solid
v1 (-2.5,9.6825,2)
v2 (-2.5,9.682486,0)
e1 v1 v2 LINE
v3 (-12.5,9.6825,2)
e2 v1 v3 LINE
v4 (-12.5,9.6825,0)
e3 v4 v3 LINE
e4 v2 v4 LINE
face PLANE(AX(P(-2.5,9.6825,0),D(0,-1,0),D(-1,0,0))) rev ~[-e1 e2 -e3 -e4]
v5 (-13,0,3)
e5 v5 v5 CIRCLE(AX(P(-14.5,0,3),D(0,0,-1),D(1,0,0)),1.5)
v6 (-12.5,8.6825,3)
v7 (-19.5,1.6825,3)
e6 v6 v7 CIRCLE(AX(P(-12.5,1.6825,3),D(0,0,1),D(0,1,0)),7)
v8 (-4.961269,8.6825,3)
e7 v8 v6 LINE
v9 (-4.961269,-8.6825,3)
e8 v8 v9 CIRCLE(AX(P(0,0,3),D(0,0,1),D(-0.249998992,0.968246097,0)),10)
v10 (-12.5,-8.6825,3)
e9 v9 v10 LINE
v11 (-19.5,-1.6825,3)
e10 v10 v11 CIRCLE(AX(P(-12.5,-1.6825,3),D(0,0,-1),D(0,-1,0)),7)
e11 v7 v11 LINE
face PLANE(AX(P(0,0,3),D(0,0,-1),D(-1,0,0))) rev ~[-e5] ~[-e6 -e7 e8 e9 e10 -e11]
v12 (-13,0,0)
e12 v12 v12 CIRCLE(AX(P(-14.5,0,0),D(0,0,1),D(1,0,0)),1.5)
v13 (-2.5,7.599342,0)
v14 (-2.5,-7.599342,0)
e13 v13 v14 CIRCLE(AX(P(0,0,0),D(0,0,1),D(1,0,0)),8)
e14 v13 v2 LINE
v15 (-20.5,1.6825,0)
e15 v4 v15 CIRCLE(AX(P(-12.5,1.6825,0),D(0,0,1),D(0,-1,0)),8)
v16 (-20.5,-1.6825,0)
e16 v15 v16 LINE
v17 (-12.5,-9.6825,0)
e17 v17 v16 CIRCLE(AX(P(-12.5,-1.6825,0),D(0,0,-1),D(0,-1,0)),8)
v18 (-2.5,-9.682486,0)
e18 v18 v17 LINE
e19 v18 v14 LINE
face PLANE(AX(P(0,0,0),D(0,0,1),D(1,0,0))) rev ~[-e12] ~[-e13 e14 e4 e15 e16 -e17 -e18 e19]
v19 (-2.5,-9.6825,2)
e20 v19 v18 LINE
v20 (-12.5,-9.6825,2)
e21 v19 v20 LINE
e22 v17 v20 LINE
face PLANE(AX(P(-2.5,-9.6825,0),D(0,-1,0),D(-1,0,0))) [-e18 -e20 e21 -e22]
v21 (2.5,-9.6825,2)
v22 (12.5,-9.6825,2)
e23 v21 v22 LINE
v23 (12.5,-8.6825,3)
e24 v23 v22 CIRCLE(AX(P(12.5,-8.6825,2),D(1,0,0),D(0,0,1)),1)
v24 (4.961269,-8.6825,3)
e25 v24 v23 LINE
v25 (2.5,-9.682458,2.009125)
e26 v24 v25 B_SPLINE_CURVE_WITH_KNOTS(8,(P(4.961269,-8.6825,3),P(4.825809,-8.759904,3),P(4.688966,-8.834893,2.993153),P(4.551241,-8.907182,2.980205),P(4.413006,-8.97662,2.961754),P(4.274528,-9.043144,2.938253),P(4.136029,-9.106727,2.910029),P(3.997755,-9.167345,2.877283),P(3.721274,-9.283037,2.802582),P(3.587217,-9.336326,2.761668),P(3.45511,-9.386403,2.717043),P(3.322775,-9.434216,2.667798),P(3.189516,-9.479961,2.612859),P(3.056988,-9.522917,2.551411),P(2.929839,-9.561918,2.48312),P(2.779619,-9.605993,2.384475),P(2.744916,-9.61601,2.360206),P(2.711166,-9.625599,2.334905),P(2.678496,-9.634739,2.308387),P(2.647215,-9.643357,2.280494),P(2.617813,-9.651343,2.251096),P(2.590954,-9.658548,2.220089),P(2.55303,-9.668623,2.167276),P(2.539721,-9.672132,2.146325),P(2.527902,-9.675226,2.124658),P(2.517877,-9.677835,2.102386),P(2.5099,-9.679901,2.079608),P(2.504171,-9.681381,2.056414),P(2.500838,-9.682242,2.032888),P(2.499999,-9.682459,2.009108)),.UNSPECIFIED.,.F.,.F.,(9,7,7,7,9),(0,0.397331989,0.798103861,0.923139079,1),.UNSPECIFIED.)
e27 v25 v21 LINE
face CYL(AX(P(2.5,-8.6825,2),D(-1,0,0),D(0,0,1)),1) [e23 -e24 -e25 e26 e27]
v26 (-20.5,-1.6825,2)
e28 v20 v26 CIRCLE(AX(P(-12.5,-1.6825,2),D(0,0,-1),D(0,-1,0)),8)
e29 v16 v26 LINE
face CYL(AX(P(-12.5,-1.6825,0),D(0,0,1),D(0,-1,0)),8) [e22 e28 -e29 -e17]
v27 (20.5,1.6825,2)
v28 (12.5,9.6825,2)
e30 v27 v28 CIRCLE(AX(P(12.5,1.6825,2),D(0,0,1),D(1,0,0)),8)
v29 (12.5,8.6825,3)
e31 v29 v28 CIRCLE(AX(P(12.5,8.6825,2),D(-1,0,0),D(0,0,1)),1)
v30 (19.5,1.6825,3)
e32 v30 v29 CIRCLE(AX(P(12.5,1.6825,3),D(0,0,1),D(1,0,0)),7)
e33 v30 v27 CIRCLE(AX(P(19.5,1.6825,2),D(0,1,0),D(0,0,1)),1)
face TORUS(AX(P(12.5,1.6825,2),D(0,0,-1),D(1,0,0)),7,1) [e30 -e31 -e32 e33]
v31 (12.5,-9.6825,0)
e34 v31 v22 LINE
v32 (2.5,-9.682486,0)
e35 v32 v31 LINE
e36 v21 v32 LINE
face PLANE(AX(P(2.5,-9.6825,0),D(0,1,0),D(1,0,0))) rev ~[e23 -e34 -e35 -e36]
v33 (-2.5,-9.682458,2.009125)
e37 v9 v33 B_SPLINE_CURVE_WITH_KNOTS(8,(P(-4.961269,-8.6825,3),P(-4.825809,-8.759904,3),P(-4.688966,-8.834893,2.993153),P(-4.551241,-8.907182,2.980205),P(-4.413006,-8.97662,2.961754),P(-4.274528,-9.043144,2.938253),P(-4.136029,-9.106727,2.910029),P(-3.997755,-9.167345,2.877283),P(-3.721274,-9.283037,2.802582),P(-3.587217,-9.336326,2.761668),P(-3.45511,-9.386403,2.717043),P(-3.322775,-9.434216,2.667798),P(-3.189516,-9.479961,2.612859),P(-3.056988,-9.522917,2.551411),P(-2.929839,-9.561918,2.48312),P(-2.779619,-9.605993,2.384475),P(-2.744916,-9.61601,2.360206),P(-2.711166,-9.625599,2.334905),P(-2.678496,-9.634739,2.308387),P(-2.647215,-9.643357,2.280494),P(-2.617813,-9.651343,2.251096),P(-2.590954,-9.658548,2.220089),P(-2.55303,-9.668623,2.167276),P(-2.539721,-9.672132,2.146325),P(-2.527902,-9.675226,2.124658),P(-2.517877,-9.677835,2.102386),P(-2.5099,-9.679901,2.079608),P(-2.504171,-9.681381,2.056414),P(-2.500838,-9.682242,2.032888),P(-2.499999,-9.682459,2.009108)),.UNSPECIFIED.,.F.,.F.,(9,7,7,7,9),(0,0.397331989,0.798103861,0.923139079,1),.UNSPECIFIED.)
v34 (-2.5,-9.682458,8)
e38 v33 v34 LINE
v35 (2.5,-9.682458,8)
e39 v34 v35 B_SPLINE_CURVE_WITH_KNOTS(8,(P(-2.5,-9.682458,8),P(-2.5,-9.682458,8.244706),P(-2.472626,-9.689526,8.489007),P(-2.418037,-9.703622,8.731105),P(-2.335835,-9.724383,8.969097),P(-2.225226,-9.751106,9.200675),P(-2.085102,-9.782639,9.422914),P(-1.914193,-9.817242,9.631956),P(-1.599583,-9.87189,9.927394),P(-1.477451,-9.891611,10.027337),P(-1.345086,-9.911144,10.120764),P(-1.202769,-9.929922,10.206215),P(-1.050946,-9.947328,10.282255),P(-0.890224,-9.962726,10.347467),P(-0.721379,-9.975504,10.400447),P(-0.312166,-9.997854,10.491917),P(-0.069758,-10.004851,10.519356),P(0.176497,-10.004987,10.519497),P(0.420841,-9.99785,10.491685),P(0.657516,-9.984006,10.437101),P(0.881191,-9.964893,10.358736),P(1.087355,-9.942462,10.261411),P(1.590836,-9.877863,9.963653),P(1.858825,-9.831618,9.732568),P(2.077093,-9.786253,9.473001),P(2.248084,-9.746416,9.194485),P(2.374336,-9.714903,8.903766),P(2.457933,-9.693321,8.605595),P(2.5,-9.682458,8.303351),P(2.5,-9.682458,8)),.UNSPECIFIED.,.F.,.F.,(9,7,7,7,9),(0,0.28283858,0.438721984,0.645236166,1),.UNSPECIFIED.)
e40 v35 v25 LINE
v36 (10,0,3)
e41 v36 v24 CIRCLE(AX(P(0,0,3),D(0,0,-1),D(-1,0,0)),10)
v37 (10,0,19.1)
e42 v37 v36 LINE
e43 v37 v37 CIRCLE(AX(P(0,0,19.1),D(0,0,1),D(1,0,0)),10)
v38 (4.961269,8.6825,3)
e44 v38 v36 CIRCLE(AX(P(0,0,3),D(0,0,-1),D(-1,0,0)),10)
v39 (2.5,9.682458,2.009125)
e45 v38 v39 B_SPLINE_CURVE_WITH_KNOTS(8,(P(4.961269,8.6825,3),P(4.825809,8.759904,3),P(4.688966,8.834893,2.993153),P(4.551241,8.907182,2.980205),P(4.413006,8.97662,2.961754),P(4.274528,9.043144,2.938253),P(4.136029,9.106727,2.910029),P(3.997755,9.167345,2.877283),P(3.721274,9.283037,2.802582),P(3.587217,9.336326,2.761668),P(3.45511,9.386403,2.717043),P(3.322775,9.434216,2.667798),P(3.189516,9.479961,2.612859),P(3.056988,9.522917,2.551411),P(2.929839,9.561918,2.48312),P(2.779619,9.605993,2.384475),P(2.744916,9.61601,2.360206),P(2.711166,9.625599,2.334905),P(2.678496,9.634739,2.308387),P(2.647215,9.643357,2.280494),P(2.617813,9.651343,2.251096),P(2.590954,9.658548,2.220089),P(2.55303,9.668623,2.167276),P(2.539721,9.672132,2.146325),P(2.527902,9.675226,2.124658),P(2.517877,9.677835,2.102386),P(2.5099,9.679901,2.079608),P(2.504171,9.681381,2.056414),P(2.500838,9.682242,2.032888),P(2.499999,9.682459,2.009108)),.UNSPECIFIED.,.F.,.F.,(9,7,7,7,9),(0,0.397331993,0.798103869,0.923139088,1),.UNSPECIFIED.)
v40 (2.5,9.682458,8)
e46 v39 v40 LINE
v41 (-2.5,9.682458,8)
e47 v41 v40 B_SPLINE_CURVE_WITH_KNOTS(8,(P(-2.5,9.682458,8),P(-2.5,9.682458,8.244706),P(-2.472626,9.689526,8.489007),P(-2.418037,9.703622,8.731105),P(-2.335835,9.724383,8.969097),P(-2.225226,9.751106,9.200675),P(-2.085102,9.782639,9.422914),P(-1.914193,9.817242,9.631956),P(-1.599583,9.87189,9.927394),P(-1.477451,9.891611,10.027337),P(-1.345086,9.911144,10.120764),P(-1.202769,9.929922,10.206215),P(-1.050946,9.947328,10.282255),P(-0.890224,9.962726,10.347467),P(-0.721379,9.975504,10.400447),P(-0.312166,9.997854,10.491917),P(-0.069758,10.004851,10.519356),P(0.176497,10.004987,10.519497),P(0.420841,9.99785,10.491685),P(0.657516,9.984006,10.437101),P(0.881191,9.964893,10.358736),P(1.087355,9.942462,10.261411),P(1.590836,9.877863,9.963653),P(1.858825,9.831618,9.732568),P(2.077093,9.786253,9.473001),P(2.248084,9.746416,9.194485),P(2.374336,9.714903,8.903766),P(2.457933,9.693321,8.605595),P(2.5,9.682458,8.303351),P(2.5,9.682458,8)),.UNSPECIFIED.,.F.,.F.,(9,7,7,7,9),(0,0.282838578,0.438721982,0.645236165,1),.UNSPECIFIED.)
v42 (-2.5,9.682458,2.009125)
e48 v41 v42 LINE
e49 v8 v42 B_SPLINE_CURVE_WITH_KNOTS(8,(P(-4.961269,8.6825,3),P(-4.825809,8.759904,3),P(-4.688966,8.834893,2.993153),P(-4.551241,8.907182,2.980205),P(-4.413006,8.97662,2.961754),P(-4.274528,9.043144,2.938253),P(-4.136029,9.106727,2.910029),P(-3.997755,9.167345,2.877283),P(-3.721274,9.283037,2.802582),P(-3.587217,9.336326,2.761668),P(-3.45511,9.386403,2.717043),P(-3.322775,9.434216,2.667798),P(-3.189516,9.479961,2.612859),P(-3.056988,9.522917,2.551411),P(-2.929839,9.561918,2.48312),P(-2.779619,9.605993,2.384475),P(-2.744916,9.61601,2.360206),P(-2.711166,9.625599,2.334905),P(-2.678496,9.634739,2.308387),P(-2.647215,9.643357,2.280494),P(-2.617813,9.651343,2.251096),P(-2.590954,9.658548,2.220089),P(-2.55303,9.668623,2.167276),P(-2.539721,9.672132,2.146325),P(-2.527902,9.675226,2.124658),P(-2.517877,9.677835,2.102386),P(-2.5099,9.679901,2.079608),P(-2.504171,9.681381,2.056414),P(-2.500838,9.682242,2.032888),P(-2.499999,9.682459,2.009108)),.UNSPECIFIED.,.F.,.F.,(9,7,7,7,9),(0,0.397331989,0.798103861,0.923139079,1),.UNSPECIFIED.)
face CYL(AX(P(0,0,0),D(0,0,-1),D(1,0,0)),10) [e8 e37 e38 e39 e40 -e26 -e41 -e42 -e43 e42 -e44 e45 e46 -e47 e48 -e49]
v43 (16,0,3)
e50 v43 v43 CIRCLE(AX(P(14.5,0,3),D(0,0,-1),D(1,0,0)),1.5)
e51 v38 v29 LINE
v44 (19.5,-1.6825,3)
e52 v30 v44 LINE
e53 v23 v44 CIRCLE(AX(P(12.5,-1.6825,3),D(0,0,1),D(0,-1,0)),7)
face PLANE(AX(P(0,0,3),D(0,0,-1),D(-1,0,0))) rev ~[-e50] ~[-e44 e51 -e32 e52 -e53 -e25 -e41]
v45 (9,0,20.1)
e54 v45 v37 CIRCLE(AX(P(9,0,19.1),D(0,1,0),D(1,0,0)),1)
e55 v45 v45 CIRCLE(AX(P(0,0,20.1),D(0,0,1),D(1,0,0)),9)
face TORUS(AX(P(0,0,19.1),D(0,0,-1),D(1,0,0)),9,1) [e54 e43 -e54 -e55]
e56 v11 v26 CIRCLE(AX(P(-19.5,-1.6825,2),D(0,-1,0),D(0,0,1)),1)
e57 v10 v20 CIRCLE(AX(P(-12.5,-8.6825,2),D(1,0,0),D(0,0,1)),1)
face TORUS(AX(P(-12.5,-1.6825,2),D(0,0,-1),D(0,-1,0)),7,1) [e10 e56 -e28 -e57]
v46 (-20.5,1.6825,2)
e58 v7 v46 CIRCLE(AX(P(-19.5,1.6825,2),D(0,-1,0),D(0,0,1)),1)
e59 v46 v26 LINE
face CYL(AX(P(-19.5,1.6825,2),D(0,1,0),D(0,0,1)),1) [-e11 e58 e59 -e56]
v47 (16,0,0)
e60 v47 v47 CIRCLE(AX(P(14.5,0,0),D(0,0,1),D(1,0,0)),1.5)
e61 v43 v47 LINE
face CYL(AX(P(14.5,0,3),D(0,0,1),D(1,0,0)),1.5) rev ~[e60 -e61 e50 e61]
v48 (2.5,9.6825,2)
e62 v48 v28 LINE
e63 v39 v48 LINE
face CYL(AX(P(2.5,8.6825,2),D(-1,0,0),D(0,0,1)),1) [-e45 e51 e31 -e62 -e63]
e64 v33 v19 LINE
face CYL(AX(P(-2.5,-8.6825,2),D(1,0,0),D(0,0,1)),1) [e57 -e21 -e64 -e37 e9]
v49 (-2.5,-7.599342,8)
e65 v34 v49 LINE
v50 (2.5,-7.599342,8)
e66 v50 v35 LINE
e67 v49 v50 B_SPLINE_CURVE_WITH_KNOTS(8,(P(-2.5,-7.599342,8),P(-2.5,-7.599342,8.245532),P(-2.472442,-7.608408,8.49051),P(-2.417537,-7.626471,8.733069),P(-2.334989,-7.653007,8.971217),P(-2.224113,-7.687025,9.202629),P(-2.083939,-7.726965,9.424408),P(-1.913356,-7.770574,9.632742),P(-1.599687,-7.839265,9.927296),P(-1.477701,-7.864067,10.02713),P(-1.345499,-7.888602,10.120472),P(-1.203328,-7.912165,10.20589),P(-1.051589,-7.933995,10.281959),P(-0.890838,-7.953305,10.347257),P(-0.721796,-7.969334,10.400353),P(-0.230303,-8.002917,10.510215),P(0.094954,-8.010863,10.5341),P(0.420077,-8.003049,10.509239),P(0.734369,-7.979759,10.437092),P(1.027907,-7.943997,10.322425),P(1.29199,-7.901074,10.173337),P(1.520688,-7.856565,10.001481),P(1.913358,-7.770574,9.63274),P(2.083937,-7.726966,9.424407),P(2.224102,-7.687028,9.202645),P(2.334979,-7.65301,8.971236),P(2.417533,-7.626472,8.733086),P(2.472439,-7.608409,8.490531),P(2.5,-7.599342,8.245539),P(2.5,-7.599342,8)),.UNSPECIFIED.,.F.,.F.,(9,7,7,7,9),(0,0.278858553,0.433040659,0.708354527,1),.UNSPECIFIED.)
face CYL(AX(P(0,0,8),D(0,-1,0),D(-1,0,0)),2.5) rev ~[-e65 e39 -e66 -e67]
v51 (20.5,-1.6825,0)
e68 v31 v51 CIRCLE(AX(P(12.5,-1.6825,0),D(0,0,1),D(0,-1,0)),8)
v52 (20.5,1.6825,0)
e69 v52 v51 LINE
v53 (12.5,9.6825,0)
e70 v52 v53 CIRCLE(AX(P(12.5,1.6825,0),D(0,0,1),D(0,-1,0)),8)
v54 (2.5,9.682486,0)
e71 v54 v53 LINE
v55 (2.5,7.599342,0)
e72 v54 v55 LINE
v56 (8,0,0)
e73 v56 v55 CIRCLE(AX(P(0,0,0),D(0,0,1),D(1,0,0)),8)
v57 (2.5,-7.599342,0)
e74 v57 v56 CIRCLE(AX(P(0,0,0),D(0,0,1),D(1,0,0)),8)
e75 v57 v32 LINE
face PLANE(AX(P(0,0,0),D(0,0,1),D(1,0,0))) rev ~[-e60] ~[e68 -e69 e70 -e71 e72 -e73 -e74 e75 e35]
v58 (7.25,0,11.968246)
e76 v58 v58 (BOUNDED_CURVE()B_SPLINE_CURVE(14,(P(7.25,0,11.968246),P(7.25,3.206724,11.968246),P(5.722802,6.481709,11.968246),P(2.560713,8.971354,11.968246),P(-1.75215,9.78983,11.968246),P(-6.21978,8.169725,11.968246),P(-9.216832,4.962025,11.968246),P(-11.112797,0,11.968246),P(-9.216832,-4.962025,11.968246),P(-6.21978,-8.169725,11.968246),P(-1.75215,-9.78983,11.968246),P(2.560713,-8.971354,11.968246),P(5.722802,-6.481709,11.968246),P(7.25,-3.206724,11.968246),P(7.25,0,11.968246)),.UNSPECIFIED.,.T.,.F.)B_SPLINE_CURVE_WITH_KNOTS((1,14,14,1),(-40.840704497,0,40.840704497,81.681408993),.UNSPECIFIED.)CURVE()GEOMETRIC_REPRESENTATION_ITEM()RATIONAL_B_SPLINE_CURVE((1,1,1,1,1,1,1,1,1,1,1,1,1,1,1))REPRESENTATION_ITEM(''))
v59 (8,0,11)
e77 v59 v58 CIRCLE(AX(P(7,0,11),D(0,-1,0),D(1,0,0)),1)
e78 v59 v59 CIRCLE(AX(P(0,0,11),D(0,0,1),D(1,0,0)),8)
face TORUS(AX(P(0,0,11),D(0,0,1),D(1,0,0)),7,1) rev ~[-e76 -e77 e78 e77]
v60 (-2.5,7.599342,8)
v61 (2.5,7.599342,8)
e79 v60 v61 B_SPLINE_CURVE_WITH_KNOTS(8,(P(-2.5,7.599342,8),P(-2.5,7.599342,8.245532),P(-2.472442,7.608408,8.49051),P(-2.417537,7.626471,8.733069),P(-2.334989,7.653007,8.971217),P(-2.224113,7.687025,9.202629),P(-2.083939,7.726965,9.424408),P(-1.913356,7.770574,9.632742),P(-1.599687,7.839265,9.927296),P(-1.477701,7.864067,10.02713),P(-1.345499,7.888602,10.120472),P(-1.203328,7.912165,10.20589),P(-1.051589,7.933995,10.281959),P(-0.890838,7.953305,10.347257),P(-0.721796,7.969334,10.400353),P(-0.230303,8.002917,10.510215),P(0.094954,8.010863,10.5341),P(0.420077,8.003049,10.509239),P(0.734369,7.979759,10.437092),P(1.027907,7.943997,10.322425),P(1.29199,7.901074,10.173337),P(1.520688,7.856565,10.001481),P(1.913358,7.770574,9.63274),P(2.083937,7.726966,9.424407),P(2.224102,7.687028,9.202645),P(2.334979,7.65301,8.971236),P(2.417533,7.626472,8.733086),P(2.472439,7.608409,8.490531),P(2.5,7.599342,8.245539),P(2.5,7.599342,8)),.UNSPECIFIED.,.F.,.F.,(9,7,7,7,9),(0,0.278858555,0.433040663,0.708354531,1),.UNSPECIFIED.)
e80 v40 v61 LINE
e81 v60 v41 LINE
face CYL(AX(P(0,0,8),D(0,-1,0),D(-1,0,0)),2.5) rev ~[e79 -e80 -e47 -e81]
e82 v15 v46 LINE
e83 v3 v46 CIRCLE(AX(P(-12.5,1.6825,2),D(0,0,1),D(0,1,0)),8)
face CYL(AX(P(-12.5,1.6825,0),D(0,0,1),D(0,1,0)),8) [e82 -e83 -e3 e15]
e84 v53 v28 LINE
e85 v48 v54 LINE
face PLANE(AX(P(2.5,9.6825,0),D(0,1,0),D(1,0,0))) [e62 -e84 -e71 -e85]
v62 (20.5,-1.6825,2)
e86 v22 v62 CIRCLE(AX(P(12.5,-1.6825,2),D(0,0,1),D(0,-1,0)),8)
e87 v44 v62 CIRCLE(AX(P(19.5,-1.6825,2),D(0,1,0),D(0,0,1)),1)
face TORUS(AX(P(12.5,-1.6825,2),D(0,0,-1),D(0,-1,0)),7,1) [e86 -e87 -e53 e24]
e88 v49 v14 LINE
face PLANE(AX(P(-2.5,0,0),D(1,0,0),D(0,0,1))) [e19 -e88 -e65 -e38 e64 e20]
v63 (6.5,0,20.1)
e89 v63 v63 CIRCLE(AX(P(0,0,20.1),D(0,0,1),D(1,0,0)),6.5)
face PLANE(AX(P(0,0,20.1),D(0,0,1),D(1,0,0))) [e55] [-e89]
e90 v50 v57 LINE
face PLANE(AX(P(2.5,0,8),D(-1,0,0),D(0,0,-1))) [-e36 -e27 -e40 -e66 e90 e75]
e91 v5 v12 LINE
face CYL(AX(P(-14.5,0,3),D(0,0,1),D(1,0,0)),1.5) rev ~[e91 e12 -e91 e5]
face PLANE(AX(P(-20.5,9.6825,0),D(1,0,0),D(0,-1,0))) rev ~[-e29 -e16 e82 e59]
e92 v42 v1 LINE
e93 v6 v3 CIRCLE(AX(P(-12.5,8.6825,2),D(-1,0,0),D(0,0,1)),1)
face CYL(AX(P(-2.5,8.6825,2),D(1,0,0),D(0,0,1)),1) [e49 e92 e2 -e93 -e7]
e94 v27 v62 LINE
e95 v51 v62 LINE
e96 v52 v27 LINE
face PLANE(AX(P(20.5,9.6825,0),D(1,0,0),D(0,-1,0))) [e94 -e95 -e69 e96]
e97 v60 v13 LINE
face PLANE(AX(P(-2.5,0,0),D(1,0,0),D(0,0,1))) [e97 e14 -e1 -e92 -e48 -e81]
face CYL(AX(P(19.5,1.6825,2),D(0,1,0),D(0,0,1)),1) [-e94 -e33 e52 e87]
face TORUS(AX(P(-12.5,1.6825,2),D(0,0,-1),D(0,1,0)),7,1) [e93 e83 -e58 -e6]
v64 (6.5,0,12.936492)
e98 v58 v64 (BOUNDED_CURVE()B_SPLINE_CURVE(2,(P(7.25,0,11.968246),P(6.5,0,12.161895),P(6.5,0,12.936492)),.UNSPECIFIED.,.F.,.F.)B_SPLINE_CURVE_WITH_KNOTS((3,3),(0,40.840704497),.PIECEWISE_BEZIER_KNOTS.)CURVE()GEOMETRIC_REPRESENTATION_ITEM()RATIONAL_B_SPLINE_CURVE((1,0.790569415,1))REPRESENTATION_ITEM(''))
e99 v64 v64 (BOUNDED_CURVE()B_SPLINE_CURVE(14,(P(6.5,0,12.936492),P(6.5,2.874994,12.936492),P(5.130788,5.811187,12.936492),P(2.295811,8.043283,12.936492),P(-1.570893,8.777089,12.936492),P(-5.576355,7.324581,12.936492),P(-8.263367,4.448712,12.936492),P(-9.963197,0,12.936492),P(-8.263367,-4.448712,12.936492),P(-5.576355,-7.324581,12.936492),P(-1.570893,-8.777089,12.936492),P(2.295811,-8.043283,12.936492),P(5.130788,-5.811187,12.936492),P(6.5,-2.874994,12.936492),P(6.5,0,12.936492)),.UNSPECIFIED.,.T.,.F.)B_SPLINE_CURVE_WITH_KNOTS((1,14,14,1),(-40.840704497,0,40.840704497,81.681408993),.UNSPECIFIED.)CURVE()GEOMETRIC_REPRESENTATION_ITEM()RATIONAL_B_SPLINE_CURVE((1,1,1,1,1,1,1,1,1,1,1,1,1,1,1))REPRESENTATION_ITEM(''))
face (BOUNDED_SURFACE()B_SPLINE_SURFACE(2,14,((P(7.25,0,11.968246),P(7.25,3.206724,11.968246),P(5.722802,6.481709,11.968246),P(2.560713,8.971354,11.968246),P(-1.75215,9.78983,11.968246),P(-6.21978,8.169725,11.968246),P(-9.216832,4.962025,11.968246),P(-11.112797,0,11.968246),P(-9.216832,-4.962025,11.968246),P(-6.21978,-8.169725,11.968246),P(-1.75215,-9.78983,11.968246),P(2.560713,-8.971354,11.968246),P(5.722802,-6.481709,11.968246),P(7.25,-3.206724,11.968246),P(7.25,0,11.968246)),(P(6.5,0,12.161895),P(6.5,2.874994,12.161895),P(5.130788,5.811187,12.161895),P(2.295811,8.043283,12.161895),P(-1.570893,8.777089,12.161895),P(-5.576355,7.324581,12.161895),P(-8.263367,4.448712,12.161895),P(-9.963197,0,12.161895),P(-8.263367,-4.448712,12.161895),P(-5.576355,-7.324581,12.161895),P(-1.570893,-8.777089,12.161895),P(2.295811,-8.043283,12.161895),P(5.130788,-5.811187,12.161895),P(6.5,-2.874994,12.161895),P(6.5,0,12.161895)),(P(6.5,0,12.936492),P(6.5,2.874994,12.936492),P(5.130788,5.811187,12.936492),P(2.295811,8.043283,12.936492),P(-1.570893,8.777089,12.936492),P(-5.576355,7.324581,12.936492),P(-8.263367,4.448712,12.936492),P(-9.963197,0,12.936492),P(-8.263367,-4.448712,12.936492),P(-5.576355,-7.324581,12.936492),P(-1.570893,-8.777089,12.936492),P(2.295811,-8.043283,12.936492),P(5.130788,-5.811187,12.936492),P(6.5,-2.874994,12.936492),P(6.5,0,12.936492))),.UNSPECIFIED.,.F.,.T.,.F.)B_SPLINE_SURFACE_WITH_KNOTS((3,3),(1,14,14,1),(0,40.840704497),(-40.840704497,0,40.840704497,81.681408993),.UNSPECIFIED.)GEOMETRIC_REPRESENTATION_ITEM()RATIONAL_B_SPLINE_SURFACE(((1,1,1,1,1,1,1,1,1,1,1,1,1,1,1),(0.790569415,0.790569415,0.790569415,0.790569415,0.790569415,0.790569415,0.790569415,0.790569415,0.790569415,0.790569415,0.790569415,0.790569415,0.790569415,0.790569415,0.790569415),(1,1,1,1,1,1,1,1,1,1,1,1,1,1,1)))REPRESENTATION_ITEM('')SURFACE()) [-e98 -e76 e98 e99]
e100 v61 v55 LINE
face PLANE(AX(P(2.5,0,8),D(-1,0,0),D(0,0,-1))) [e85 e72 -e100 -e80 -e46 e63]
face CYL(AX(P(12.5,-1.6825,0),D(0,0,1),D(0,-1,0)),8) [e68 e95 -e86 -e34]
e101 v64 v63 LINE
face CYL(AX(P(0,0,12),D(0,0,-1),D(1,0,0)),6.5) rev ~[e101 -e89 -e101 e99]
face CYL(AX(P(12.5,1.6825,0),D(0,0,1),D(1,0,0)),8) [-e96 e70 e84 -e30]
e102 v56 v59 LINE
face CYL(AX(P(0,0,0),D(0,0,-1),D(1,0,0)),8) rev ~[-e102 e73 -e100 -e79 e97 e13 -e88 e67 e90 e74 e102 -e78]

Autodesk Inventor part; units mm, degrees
ref_plane "YZ Plane" through (0, 0, 0) normal (1, 0, 0) x (0, 1, 0)
ref_plane "XZ Plane" through (0, 0, 0) normal (0, 1, 0) x (-1, 0, 0)
ref_plane "XY Plane" through (0, 0, 0) normal (0, 0, 1) x (1, 0, 0)
sketch "スケッチ1" plane through (0, 0, 0) normal (0, 0, 1) x (1, 0, 0)
  circle A0 centre (0, 0) radius 8
  circle A1 centre (0, 0) radius 10
  dimension "d0" = 16
  dimension "d1" = 2
extrude "押し出し1" add sketch "スケッチ1" along normal blind 12
sketch "スケッチ2" plane through (0, 0, 12) normal (0, 0, 1) x (1, 0, 0)
  circle A0 centre (0, 0) radius 6.5
  circle A1 centre (0, 0) radius 10 projected
  circle A2 centre (0, 0) radius 10
  dimension "d4" = 13
extrude "押し出し2" add sketch "スケッチ2" along normal blind 8.1
sketch "スケッチ3" plane through (0, 0, 0) normal (0, 1, 0) x (-1, 0, 0)
  line L0 (10, 0) -> (-10, 0) projected
  line L1 (2.5, 0) -> (2.5, 8)
  arc A0 (2.5, 8) -> (-2.5, 8) centre (0, 8) ccw
  line L2 (-2.5, 8) -> (-2.5, 0)
  line L3 (2.5, 0) -> (-2.5, 0)
  line L4 (0, -2.1) -> (0, 12.6) projected
  point P0 (0, 0)
  dimension "d7" = 5
  dimension "d8" = 8
extrude "押し出し3" cut sketch "スケッチ3" along normal through all both and the other way through all
fillet "フィレット1" radius 1 2 edges at (-8, 0, 12) (-6.5, 0, 12)
fillet "フィレット2" radius 1 1 edges at (-10, 0, 20.1)
sketch "スケッチ4" plane through (0, 0, 0) normal (0, 0, -1) x (-1, 0, 0)
  line L0 (2.5, -9.6825) -> (2.5, -7.5993) projected
  line L1 (2.5, -9.6825) -> (20.5, -9.6825)
  circle A0 centre (0, 0) radius 10 projected
  line L2 (2.5, 9.6825) -> (20.5, 9.6825)
  line L3 (20.5, 9.6825) -> (20.5, -9.6825)
  line L4 (2.5, 7.5993) -> (2.5, 9.6825) projected
  arc A1 (2.5, -9.6825) -> (2.5, 9.6825) centre (0, 0) ccw
  line L5 (0, -14) -> (0, 14) projected
  line L6 (-2.5, -9.6825) -> (-20.5, -9.6825)
  line L7 (-2.5, 9.6825) -> (-20.5, 9.6825)
  line L8 (-20.5, 9.6825) -> (-20.5, -9.6825)
  arc A2 (-2.5, 9.6825) -> (-2.5, -9.6825) centre (0, 0) ccw
  point P0 (-2.5, -9.6825)
  dimension "d13" = 18
extrude "押し出し4" add sketch "スケッチ4" against normal blind 3 contours A0 L2 L3 L1 | L6 L8 L7 A0
fillet "フィレット3" radius 8 4 edges at (20.5, 9.6825, 1.5) (20.5, -9.6825, 1.5) (-20.5, -9.6825, 1.5) (-20.5, 9.6825, 1.5)
fillet "フィレット4" radius 1 10 edges at (-18.1569, -7.3393, 3) (-7.5, -9.6825, 3) (-18.1569, 7.3393, 3) (-7.5, 9.6825, 3) (-20.5, 0, 3) (18.1569, 7.3393, 3) (7.5, 9.6825, 3) (18.1569, -7.3393, 3) (7.5, -9.6825, 3) (20.5, 0, 3)
sketch "スケッチ5" plane through (0, 0, 3) normal (0, 0, 1) x (1, 0, 0)
  circle A0 centre (14.5, 0) radius 1.5
  circle A1 centre (0, 0) radius 10 projected
  line L0 (-28.7, 0) -> (28.7, 0) projected
  line L1 (0, -14.0024) -> (0, 14.0024) projected
  circle A2 centre (-14.5, 0) radius 1.5
  dimension "d18" = 3
  dimension "d19" = 3
extrude "押し出し5" cut sketch "スケッチ5" against normal through all contours L0 A0 | A0 L0 | A2 L0 | L0 A2
properties part number "cover.ver1"
